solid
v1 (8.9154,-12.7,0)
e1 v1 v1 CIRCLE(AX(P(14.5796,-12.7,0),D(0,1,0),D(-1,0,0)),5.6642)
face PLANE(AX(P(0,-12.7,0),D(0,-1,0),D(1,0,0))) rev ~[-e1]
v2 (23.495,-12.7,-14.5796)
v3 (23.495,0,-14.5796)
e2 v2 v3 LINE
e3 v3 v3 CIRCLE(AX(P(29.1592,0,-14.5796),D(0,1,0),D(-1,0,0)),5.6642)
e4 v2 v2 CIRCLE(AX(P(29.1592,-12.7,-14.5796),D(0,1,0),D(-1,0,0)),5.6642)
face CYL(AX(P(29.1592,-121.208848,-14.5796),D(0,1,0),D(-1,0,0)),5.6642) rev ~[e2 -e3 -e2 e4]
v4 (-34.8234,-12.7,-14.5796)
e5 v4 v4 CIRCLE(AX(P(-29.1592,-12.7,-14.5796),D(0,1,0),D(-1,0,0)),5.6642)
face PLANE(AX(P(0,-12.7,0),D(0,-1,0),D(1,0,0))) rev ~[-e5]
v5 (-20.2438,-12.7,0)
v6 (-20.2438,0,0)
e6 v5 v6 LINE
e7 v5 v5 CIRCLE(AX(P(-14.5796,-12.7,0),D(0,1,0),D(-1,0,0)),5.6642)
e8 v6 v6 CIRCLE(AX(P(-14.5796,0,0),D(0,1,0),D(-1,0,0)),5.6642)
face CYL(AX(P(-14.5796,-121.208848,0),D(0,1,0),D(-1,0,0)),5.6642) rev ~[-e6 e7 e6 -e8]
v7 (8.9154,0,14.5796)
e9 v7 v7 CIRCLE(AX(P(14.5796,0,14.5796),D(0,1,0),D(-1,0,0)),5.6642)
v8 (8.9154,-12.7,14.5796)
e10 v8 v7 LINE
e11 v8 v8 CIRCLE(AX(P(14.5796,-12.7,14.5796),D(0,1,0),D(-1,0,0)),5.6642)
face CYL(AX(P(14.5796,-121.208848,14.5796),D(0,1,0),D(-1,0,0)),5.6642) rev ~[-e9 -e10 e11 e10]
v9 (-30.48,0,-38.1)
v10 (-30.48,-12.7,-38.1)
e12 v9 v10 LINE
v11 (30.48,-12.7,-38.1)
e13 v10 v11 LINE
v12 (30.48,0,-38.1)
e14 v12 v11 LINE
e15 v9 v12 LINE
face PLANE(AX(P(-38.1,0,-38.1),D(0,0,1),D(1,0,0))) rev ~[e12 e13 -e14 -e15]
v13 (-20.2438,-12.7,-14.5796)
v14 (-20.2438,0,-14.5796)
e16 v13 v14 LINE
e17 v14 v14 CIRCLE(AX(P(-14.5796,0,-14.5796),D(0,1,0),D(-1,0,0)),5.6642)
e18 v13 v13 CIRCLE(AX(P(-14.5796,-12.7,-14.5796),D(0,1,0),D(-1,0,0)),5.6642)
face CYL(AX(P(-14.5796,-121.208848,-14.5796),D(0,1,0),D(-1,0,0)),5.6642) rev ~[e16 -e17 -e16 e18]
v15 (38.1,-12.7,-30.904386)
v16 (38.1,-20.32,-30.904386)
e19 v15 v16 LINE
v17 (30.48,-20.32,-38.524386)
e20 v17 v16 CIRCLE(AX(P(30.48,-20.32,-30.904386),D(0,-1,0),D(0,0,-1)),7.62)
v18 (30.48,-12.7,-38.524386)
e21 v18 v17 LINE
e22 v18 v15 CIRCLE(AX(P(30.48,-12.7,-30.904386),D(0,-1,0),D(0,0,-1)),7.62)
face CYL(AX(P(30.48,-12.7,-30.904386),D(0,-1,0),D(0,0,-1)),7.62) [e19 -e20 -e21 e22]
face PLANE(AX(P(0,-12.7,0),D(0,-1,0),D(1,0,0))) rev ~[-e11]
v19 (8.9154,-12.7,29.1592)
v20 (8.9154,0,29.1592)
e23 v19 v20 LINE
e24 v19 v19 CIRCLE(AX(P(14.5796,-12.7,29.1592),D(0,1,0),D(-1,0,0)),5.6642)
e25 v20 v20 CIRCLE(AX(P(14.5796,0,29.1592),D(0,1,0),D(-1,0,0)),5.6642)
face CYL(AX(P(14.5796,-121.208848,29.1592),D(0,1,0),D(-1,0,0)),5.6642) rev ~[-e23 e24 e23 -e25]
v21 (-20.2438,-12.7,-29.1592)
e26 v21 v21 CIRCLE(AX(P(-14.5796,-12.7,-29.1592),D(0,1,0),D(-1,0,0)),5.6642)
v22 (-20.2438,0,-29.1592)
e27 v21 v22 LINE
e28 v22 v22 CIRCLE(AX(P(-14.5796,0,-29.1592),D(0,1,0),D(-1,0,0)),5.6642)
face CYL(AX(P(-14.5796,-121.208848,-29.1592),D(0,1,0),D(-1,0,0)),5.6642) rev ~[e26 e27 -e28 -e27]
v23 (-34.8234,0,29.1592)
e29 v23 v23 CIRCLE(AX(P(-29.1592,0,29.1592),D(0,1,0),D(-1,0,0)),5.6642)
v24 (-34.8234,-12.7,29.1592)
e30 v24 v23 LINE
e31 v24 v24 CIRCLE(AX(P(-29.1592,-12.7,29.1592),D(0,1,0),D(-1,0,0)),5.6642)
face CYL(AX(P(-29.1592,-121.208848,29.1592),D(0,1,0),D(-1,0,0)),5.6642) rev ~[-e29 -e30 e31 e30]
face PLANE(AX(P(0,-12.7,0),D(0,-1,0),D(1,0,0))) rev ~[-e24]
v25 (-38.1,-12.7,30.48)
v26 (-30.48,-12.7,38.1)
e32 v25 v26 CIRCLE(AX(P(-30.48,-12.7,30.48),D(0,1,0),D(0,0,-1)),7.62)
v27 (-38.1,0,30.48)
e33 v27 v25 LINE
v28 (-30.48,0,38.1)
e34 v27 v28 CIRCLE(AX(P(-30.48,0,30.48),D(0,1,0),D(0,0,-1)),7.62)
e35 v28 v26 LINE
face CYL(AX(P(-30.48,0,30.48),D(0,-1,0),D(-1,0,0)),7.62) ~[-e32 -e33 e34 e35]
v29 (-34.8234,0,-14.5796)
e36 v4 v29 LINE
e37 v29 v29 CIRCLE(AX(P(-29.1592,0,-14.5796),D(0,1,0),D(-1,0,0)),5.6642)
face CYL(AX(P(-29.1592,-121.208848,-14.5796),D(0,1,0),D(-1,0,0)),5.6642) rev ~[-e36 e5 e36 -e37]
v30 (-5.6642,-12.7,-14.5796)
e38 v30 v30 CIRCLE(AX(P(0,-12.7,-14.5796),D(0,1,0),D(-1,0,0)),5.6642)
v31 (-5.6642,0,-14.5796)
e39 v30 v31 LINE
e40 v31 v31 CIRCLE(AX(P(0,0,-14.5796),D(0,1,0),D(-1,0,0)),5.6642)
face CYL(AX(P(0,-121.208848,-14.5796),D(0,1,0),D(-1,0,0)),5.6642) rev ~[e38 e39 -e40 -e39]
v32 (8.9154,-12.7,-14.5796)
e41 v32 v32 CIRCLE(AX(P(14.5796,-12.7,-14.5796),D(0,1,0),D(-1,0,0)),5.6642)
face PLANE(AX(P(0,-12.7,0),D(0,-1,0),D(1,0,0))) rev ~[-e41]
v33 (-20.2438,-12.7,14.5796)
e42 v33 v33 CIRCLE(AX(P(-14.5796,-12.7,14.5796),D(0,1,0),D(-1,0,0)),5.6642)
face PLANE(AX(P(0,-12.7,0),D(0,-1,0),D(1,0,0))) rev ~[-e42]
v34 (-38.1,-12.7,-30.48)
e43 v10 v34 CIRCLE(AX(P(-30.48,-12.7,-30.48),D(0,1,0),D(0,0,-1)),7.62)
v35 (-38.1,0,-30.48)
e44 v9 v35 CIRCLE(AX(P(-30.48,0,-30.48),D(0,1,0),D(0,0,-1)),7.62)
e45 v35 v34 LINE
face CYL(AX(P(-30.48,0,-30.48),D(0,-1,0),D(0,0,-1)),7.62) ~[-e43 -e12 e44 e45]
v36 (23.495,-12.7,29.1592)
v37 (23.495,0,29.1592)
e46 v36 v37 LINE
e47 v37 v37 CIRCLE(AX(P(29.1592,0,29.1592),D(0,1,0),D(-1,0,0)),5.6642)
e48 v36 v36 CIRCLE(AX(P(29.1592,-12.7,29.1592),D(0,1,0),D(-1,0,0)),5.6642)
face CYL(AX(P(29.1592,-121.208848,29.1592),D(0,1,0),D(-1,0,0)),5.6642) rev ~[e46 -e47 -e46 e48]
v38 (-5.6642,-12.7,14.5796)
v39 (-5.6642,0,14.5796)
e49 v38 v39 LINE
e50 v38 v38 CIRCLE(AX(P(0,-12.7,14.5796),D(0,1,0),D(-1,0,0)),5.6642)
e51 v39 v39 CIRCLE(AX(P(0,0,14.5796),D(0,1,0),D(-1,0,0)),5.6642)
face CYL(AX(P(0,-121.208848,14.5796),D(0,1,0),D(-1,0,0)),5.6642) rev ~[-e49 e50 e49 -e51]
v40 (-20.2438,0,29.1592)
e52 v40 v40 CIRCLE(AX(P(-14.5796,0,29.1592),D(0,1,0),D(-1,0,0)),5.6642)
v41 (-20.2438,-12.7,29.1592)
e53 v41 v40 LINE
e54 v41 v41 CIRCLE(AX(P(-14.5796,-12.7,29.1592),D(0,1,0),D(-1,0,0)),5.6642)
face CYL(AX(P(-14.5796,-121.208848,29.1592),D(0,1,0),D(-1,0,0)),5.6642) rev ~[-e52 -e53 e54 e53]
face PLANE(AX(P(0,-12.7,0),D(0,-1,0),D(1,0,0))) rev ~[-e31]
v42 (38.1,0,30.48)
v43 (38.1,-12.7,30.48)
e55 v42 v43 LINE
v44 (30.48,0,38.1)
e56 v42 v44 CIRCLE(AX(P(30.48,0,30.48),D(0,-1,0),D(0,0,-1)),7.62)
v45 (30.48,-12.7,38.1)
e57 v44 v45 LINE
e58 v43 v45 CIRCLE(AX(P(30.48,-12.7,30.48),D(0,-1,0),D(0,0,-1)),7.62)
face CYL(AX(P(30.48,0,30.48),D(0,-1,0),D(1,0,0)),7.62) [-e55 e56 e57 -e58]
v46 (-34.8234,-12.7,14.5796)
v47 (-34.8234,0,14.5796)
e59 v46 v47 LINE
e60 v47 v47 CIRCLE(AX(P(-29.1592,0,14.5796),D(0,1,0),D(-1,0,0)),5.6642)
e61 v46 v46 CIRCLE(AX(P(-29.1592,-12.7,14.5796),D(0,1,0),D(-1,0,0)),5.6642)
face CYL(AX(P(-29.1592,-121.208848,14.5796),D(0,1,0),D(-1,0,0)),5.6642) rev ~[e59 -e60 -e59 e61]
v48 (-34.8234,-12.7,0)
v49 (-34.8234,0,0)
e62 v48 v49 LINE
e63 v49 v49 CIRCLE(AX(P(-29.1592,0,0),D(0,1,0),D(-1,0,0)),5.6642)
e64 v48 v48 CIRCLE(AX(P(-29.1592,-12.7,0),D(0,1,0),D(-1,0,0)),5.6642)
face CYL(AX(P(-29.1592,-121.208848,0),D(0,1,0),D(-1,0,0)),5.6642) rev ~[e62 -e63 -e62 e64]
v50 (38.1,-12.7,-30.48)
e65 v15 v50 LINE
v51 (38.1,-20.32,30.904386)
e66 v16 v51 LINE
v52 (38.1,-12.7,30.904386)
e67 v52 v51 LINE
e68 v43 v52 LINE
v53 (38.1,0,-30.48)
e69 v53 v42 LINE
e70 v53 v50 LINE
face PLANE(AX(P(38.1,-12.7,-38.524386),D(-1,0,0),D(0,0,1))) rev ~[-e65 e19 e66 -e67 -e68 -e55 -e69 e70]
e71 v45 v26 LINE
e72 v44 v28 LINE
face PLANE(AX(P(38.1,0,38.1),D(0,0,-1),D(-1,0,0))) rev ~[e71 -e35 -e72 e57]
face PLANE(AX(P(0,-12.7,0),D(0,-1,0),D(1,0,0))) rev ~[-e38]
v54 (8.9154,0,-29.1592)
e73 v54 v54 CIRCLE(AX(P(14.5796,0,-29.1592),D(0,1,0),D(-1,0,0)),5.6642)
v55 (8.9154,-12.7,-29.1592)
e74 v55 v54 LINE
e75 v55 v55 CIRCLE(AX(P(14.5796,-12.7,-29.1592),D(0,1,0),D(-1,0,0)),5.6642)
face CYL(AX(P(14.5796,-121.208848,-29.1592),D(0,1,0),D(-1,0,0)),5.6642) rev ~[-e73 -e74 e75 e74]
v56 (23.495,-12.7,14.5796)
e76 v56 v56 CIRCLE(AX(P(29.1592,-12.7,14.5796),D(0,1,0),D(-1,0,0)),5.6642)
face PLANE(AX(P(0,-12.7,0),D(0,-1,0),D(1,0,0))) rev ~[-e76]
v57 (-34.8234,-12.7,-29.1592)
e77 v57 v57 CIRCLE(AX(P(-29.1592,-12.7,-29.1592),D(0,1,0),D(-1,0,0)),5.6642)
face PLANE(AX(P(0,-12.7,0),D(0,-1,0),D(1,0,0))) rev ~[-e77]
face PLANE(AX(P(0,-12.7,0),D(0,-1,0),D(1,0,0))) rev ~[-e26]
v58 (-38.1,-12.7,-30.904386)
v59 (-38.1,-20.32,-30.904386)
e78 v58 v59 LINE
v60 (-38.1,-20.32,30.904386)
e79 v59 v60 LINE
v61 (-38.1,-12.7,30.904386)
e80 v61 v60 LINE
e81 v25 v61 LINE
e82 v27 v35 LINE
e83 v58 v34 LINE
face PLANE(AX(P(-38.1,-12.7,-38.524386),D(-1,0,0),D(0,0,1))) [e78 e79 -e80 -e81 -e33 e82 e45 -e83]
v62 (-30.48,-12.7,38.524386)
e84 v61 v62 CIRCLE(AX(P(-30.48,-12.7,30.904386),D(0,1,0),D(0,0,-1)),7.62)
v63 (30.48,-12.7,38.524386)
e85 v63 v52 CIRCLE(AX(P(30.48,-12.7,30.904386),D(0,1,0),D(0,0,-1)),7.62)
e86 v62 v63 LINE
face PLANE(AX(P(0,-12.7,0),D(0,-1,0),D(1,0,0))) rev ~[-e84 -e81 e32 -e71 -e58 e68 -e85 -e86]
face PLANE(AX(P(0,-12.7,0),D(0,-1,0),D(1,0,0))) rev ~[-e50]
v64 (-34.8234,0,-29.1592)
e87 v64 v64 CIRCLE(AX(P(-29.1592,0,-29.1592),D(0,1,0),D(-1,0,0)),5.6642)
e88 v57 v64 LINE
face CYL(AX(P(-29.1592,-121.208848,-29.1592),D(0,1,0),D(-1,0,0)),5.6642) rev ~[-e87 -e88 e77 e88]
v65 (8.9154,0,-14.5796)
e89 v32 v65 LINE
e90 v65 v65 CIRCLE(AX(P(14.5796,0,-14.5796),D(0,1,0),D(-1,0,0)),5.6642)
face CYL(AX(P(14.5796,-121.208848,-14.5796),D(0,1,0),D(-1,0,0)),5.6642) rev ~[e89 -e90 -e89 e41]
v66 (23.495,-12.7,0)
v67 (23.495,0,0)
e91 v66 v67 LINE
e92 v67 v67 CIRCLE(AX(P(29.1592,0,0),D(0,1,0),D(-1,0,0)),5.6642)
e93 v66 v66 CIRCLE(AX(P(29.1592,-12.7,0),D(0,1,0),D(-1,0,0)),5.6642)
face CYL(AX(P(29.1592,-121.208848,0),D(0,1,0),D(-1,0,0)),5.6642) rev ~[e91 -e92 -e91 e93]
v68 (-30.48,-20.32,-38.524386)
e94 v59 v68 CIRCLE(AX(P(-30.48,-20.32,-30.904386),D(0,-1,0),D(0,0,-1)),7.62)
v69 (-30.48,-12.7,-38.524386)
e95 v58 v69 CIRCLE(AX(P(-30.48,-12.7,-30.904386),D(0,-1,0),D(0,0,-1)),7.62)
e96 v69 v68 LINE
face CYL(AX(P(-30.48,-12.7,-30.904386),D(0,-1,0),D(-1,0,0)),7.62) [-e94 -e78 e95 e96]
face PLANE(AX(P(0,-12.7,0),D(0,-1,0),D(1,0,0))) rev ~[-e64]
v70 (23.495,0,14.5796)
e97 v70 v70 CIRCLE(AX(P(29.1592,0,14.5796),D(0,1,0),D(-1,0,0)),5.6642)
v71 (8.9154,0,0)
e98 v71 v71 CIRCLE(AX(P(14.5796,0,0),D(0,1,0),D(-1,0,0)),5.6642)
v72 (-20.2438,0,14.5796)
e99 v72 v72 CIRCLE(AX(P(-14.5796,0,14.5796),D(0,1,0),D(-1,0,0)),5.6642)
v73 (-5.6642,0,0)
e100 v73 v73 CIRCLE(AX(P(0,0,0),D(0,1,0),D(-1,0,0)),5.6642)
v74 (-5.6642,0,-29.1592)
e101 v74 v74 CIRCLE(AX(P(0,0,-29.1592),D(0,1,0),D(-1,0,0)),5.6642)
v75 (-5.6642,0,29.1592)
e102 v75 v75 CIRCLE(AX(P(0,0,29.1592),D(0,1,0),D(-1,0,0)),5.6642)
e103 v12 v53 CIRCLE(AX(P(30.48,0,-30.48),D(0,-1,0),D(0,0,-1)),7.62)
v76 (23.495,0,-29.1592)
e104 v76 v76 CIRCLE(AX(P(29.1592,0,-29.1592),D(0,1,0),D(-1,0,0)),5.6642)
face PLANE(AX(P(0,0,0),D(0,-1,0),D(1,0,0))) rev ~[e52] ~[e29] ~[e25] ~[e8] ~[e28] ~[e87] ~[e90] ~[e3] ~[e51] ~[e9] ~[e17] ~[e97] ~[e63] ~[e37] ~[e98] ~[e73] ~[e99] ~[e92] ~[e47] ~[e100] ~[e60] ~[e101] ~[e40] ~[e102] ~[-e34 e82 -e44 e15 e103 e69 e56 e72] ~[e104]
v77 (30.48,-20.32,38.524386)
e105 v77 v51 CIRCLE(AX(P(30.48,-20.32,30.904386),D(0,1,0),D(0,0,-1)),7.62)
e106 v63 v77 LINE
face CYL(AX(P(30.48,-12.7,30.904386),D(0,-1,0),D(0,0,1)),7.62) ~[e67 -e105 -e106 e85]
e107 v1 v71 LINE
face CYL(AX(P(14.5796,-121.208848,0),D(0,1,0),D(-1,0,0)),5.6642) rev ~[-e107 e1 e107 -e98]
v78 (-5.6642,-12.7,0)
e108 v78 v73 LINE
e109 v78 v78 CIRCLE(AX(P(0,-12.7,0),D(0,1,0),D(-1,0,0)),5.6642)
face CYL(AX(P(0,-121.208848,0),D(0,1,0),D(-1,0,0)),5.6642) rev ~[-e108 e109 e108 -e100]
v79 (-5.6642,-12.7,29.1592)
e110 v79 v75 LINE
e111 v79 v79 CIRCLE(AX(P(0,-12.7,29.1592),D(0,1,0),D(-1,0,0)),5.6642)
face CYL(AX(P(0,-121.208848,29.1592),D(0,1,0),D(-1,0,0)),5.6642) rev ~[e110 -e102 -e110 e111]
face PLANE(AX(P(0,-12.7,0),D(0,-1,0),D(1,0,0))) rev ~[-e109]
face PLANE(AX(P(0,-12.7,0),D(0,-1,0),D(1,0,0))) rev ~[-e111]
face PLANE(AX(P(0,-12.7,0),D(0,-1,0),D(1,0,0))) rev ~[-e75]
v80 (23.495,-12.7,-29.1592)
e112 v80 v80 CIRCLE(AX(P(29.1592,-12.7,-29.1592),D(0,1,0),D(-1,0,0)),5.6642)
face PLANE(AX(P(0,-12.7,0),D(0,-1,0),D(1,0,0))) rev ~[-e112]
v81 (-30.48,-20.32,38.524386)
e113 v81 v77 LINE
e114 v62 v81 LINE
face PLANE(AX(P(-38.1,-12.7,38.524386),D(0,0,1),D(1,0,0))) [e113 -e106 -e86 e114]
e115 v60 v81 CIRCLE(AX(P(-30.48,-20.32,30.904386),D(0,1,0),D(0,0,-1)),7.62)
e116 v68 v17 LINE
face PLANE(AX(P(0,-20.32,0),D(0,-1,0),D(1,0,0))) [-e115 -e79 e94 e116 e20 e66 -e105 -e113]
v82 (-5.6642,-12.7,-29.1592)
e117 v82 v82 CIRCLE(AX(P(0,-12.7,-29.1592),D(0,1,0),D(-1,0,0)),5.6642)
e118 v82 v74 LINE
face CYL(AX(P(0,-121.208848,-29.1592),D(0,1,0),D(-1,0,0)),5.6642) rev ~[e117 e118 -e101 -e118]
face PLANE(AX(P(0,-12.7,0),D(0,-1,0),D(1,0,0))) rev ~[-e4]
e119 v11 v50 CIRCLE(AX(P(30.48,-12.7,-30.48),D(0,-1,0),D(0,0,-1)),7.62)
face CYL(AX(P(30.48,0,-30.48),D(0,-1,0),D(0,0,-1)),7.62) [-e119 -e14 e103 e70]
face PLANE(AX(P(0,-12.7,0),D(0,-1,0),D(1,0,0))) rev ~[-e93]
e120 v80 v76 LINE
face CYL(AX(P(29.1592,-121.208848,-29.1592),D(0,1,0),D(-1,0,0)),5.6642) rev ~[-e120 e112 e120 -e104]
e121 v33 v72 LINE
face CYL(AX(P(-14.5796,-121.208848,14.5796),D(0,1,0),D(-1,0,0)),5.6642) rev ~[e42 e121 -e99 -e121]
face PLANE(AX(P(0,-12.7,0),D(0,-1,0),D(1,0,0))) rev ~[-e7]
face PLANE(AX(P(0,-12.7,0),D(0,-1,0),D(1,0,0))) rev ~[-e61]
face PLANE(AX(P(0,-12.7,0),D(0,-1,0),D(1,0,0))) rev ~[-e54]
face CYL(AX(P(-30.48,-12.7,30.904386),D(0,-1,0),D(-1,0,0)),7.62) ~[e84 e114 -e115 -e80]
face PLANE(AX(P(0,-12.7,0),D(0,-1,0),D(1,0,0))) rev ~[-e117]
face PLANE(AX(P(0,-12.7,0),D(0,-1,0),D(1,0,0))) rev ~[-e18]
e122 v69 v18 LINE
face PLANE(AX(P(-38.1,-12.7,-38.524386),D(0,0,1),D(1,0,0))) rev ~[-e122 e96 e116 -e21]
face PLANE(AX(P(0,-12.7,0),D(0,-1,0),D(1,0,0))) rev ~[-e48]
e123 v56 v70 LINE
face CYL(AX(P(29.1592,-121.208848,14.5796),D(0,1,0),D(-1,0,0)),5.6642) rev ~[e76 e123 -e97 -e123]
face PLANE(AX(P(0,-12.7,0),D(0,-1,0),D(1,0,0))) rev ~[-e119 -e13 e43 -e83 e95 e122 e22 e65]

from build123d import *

# Parameters (mm, degrees)
F1_DEPTH = 12.7
F3_D     = 11.3284
F4_R     = 7.62
F5_W     = 76.2
F5_H     = 77.0487710834
F6_DEPTH = 7.62
F7_R     = 7.62


# Not quite as in the source:
# - a feature names something its author has since deleted; it is built from what else it names


with BuildPart() as f1:
    # F0 (on Front) → F1 (new body)
    with BuildSketch(Plane.XZ):
        Polygon((-38.1, -38.1), (38.1, -38.1), (38.1, -30.48), (38.1, 38.1), (-38.1, 38.1), align=None)
    extrude(amount=F1_DEPTH)

    # F3 (through all)
    with Locations(Plane.XZ.offset(12.7)):
        with Locations((-29.1592, 29.1592), (-14.5796, 29.1592), (0, 29.1592), (14.5796, 29.1592), (29.1592, 29.1592), (29.1592, 14.5796), (29.1592, 0), (29.1592, -14.5796), (29.1592, -29.1592), (14.5796, -29.1592), (14.5796, -14.5796), (14.5796, 0), (14.5796, 14.5796), (0, 14.5796), (0, 0), (0, -14.5796), (0, -29.1592), (-14.5796, -29.1592), (-14.5796, -14.5796), (-14.5796, 0), (-14.5796, 14.5796), (-29.1592, 14.5796), (-29.1592, 0), (-29.1592, -14.5796), (-29.1592, -29.1592)):
            Hole(F3_D / 2)

    # F4
    f4_edges = [f1.edges().sort_by_distance(p)[0] for p in [
        (-38.1, -6.35, 38.1),
        (38.1, -6.35, 38.1),
        (38.1, -6.35, -38.1),
        (-38.1, -6.35, -38.1),
    ]]
    fillet(f4_edges, radius=F4_R)

    # F5 (on face) → F6 (join)
    with BuildSketch(Plane.XZ.offset(12.7)):
        Rectangle(F5_W, F5_H)
    extrude(amount=F6_DEPTH)

    # F7
    f7_edges = [f1.edges().sort_by_distance(p)[0] for p in [
        (-38.1, -16.51, 38.524386),
        (38.1, -16.51, 38.524386),
        (38.1, -16.51, -38.524386),
        (-38.1, -16.51, -38.524386),
    ]]
    fillet(f7_edges, radius=F7_R)


solid = f1.part
